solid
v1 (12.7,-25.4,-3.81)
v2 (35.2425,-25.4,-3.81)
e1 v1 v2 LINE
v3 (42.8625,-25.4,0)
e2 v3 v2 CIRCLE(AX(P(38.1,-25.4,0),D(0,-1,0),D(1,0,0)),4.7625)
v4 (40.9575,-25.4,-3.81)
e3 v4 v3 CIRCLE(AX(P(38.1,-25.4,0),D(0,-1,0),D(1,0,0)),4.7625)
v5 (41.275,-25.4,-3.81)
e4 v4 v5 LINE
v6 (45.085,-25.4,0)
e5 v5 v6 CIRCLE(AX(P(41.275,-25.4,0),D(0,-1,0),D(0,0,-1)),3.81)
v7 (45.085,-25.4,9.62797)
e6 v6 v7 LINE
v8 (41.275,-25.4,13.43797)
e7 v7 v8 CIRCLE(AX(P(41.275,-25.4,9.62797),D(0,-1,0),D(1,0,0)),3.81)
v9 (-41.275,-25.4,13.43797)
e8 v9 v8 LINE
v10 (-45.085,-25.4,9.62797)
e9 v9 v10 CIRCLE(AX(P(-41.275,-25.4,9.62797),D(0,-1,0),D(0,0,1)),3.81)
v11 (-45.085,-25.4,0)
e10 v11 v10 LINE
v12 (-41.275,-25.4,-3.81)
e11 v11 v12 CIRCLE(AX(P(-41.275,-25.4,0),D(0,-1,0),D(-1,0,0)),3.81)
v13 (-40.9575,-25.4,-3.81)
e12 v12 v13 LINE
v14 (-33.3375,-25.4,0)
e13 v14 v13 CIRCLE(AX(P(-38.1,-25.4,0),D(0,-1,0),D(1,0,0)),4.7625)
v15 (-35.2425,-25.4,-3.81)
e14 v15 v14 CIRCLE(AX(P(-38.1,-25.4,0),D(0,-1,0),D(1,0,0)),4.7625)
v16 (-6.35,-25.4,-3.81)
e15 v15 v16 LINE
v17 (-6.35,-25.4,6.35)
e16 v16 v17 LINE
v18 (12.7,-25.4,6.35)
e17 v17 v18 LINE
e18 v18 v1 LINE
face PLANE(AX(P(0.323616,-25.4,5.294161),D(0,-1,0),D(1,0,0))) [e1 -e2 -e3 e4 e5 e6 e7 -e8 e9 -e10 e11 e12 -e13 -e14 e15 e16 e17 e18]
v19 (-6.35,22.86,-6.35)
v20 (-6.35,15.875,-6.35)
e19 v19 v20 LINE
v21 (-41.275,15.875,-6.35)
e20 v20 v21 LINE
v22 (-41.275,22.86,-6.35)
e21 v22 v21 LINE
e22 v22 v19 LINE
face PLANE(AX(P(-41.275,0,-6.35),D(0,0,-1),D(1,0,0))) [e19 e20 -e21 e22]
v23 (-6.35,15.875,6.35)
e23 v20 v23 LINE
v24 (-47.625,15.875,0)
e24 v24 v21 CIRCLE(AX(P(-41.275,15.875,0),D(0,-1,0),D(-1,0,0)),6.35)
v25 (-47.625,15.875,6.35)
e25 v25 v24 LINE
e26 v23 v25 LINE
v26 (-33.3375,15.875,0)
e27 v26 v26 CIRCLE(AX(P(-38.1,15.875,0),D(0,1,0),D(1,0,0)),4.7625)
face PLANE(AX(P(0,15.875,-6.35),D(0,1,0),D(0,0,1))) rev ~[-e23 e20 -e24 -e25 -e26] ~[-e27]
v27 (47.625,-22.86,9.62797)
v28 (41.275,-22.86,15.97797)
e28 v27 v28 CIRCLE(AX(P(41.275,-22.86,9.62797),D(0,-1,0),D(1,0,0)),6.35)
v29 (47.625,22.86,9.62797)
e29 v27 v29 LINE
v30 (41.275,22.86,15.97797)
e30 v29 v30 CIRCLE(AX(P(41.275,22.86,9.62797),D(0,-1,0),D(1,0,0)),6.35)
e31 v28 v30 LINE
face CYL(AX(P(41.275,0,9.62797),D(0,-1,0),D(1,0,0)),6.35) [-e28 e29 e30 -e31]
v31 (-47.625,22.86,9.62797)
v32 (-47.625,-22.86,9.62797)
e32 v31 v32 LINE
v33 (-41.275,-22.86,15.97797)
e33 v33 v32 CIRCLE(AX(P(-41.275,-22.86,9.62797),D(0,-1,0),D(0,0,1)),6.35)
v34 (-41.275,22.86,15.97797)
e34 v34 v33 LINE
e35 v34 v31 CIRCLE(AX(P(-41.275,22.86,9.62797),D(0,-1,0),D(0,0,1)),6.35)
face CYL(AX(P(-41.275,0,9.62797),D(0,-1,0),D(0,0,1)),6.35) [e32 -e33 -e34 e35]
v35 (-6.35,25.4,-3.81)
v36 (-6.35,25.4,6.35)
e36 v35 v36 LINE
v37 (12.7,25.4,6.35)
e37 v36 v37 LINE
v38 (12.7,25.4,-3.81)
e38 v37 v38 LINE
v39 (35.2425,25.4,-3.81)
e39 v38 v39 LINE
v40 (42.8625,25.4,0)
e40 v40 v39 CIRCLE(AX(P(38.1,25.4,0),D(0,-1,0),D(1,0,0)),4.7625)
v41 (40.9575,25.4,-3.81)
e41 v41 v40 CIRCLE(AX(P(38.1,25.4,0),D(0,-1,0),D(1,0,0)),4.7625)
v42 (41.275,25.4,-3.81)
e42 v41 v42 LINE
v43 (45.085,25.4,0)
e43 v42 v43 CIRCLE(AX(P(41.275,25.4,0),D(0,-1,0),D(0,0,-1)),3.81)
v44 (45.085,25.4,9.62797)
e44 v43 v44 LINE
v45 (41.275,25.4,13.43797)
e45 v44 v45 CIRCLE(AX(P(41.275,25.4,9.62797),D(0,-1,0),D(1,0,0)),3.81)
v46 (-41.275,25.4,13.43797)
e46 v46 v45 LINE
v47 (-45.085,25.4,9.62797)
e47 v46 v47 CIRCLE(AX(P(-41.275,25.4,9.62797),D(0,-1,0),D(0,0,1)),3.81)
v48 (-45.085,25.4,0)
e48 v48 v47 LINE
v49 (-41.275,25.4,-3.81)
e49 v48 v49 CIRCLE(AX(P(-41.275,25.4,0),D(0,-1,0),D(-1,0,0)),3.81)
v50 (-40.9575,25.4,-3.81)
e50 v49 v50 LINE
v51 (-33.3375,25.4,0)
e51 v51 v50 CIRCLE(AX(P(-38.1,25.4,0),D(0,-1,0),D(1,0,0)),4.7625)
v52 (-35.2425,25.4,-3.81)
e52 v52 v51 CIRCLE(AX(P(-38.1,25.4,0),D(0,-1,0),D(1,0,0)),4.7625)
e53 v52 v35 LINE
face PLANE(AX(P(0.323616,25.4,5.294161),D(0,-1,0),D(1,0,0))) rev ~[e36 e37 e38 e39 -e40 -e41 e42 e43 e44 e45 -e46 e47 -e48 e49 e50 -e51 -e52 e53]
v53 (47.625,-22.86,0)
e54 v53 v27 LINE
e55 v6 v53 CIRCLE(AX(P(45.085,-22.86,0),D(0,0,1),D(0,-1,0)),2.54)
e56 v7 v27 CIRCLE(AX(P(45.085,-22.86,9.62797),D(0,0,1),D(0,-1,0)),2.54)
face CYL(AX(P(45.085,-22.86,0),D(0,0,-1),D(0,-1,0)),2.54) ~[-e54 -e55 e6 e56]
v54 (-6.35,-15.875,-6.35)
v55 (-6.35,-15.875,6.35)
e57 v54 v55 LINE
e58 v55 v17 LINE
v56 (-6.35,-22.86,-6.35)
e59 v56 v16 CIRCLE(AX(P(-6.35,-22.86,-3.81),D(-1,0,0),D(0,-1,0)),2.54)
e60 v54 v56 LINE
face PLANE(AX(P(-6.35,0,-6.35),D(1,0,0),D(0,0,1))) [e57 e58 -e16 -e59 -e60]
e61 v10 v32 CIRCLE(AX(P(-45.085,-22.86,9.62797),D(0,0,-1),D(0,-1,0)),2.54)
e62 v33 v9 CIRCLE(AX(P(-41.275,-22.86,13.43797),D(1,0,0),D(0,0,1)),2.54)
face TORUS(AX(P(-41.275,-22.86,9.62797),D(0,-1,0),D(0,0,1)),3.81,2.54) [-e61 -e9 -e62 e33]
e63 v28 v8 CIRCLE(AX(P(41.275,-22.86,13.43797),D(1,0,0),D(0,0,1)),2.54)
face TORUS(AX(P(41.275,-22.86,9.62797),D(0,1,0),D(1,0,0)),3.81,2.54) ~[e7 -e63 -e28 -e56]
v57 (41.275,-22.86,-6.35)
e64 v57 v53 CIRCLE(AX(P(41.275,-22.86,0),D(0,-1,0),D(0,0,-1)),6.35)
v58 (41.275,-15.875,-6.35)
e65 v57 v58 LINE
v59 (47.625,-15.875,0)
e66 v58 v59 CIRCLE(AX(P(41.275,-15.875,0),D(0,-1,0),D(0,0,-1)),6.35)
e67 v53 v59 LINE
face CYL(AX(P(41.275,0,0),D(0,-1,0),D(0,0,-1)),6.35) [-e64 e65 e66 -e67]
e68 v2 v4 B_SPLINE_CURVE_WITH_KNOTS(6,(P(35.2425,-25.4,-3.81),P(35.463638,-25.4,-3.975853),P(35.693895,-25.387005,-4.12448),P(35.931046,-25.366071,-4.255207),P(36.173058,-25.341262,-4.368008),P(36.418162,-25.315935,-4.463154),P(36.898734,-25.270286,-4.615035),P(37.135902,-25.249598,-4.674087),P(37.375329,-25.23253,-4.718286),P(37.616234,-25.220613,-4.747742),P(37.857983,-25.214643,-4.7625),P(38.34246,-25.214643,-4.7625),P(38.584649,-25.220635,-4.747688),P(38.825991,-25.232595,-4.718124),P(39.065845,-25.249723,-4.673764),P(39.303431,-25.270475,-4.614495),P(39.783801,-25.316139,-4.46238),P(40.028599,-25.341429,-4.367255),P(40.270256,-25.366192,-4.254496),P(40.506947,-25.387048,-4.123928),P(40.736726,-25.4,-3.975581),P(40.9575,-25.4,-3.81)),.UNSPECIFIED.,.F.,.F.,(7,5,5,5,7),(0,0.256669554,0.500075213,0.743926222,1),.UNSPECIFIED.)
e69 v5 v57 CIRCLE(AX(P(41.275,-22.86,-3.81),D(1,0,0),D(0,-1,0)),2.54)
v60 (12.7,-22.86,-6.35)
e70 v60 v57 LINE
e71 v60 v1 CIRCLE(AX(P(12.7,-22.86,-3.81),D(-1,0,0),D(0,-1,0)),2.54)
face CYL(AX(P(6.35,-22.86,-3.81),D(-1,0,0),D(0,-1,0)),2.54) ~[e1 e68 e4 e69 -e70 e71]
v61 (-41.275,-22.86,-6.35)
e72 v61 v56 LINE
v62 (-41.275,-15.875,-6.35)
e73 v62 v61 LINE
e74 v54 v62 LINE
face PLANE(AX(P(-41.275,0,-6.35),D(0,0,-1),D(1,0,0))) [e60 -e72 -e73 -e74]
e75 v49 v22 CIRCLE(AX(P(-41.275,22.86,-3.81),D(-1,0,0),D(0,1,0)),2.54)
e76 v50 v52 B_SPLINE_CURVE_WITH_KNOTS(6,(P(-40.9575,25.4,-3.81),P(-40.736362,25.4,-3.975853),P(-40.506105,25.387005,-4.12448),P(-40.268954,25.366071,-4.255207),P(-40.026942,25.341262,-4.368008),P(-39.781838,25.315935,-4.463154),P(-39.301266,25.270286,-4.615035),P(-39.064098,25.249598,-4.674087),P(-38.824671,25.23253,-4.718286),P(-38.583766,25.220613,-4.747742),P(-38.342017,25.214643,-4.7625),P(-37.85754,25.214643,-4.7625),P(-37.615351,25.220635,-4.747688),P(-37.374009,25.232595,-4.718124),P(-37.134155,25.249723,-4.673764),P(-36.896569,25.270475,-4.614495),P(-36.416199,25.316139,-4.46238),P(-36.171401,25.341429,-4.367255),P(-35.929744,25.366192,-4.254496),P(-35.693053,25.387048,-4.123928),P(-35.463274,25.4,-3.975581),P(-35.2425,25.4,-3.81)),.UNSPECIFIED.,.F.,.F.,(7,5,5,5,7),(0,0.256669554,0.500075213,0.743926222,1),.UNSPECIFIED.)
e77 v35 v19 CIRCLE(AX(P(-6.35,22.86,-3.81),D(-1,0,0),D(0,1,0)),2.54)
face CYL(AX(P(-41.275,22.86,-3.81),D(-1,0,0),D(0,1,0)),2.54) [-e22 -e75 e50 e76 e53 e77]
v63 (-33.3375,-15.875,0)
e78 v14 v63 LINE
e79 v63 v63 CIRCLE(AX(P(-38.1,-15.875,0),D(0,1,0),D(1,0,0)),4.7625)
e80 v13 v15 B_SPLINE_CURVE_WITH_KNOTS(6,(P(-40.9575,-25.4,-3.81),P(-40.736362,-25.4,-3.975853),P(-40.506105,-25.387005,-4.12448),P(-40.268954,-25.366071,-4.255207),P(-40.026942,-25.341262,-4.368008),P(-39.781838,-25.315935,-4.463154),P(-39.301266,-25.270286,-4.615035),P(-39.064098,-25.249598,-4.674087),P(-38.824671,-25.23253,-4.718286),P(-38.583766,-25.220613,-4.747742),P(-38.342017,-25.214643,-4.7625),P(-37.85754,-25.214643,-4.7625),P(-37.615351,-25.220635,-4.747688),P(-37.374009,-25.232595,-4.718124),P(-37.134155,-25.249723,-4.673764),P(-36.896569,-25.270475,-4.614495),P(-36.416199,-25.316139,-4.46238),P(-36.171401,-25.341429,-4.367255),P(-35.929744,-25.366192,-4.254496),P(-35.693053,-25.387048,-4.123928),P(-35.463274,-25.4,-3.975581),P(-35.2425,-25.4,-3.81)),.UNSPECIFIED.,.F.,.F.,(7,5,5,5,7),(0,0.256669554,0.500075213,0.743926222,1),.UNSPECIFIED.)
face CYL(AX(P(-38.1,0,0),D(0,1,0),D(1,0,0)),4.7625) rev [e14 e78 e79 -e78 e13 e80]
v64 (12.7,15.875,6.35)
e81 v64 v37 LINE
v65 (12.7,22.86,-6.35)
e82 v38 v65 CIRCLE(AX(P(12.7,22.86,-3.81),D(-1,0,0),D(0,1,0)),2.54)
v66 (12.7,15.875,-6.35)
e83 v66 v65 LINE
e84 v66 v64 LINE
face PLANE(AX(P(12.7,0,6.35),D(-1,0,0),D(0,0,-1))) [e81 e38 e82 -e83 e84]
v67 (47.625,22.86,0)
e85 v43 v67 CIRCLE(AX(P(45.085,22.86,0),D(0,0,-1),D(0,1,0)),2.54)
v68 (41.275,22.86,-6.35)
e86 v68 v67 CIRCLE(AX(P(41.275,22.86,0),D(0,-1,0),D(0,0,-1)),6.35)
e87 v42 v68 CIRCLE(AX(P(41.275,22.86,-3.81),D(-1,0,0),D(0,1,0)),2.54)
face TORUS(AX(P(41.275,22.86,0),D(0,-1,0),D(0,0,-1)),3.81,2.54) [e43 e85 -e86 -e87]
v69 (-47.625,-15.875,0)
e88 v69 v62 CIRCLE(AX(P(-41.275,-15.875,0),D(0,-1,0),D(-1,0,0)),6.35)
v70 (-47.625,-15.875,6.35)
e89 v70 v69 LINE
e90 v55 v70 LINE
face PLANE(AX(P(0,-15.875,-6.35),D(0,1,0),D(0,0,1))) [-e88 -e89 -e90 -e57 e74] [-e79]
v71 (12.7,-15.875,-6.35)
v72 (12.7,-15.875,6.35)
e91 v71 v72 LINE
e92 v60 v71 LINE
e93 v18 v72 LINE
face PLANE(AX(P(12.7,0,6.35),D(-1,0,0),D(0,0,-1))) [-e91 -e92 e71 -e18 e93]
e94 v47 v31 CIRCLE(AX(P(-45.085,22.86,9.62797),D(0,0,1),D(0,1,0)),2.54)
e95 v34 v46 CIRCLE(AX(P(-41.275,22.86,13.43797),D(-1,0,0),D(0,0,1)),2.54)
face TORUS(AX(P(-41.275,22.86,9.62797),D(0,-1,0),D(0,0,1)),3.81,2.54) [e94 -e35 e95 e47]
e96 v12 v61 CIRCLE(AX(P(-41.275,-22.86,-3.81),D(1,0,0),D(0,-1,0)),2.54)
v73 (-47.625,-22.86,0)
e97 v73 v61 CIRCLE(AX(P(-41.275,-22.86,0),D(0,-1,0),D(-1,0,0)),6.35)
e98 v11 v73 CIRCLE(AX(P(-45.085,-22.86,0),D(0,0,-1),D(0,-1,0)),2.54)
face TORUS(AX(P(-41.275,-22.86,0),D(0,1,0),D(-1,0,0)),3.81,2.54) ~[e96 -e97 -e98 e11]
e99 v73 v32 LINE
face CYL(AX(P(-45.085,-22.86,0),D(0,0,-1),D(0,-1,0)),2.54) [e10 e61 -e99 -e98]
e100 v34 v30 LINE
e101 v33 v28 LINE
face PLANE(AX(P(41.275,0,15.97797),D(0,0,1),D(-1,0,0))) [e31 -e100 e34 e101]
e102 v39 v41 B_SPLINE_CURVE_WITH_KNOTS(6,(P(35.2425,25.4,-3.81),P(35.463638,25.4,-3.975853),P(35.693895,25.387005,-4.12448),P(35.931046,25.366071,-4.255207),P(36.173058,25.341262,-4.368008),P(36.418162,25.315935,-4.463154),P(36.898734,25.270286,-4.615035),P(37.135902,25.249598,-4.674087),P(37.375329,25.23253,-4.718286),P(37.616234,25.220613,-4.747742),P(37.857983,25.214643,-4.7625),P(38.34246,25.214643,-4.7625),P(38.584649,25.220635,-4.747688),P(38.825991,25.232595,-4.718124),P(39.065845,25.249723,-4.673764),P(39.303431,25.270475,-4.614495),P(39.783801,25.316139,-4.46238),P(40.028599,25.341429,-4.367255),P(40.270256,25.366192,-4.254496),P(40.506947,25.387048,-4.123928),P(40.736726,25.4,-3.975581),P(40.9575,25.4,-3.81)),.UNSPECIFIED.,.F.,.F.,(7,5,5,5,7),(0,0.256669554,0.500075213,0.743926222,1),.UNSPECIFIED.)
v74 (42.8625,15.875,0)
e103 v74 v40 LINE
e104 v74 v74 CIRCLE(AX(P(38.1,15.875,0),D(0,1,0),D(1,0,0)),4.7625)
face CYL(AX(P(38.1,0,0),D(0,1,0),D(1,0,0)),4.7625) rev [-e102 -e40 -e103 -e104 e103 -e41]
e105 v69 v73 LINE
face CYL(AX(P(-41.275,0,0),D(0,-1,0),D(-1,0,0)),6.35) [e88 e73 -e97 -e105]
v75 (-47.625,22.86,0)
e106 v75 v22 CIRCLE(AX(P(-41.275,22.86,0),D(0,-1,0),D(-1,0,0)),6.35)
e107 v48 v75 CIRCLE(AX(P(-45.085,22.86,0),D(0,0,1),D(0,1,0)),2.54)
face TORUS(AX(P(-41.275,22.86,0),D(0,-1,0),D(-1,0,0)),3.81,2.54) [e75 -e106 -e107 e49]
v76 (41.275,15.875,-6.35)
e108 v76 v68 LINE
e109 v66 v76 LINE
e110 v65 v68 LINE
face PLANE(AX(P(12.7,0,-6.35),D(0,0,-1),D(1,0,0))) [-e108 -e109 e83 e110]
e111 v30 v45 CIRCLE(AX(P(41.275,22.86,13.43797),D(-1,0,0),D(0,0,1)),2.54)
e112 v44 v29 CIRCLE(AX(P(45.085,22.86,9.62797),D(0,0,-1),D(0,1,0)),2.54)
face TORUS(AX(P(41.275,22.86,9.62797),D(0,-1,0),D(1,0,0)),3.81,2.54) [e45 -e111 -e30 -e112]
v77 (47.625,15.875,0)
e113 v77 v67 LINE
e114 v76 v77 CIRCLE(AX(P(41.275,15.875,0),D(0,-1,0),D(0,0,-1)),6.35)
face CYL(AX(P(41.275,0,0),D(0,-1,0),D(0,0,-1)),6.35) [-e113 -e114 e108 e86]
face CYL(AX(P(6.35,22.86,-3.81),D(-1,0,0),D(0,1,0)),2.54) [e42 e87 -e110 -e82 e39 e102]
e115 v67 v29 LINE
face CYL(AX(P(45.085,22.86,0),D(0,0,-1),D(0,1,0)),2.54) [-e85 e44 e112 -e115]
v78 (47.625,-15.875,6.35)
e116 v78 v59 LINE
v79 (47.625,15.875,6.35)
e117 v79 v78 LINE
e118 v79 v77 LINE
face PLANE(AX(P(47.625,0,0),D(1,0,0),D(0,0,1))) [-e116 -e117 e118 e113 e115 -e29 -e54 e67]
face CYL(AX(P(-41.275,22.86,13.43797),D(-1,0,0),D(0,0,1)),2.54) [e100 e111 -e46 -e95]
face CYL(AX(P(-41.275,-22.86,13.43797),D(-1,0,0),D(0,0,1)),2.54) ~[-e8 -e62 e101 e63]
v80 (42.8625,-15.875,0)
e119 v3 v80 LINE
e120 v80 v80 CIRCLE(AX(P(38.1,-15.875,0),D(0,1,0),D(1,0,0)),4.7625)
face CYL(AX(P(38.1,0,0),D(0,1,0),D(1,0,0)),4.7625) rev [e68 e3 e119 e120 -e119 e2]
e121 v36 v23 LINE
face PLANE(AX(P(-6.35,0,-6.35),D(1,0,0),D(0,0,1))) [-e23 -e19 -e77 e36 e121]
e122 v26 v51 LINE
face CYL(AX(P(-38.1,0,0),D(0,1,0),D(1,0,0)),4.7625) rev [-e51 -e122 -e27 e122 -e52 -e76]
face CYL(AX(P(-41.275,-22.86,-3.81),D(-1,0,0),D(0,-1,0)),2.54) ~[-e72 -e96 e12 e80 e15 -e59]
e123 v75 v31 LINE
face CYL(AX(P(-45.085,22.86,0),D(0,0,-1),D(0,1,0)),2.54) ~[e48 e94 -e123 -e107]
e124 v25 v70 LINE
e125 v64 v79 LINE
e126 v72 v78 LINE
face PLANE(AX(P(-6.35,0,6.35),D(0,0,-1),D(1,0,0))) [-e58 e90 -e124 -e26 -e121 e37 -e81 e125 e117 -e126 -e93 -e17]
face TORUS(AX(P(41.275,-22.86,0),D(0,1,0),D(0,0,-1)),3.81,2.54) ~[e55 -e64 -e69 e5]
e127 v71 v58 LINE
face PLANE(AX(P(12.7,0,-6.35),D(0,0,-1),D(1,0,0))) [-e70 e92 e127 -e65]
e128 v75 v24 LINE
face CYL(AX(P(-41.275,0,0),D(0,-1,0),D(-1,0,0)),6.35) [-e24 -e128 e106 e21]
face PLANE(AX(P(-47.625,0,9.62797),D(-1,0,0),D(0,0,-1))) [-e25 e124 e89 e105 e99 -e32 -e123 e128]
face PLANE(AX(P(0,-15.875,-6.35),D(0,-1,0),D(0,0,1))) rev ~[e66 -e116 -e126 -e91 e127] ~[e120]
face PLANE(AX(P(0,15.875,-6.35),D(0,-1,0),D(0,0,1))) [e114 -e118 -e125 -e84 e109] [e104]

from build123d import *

# Parameters (mm, degrees)
F0_R          = 4.7625
F1_DEPTH      = 25.4
F2_W          = 31.75
F2_H          = 12.7
F3_DEPTH      = 47.626
F3_DEPTH_BACK = 47.626
F4_T1_DEPTH   = 82.55
F4_T3_DEPTH   = 9.6279704779
F4_T5_DEPTH   = 41.275
F4_T7_DEPTH   = 34.925
F4_T10_ANGLE  = 90
F4_T12_ANGLE  = 90
F4_T14_ANGLE  = 90
F4_T16_ANGLE  = 90
F4_T18_ANGLE  = 90
F4_T20_ANGLE  = 90
F4_T22_ANGLE  = 90
F4_T24_ANGLE  = 90


# Not quite as in the source:
# - a fillet or chamfer that OpenCascade refuses, or shapes differently, is made with other operations: its cross-section is extruded or revolved along the edge and cut away or added


with BuildPart() as f1:
    # F0 (on Front) → F1 (new body, symmetric)
    with BuildSketch(Plane.XZ):
        with BuildLine():
            Line((41.275, 15.9779704779), (-41.275, 15.9779704779))
            ThreePointArc((-41.275, 15.9779704779), (-45.7651280605, 14.1180985385), (-47.625, 9.6279704779))
            Line((-47.625, 9.6279704779), (-47.625, 0))
            ThreePointArc((-47.625, 0), (-45.7651280605, -4.4901280605), (-41.275, -6.35))
            Line((-41.275, -6.35), (-6.35, -6.35))
            Line((-6.35, -6.35), (-6.35, 6.35))
            Line((-6.35, 6.35), (12.7, 6.35))
            Line((12.7, 6.35), (12.7, -6.35))
            Line((12.7, -6.35), (41.275, -6.35))
            ThreePointArc((41.275, -6.35), (45.7651280605, -4.4901280605), (47.625, 0))
            Line((47.625, 0), (47.625, 9.6279704779))
            ThreePointArc((47.625, 9.6279704779), (45.7651280605, 14.1180985385), (41.275, 15.9779704779))
        make_face()
        with Locations((-38.1, 0)):
            Circle(F0_R, mode=Mode.SUBTRACT)
        with Locations((38.1, 0)):
            Circle(F0_R, mode=Mode.SUBTRACT)
    extrude(amount=F1_DEPTH, both=True)

    # F2 (on Right) → F3 (cut, two sides)
    with BuildSketch(Plane.YZ) as f3_sk:
        Rectangle(F2_W, F2_H)
    extrude(amount=F3_DEPTH, mode=Mode.SUBTRACT)
    extrude(f3_sk.sketch, amount=-F3_DEPTH_BACK, mode=Mode.SUBTRACT)

    # F4: fillet of radius 2.54 on 18 edges, made by hand

    # F4_s2 → F4_t1 (cut)
    with BuildSketch(Plane.YZ.offset(-41.275)):
        with BuildLine():
            ThreePointArc((22.86, 15.9779704779), (24.6560512242, 15.2340217022), (25.4, 13.4379704779))
            Line((25.4, 13.4379704779), (25.4, 15.9779704779))
            Line((25.4, 15.9779704779), (22.86, 15.9779704779))
        make_face()
        with BuildLine():
            ThreePointArc((-22.86, 15.9779704779), (-24.6560512242, 15.2340217022), (-25.4, 13.4379704779))
            Line((-25.4, 13.4379704779), (-25.4, 15.9779704779))
            Line((-25.4, 15.9779704779), (-22.86, 15.9779704779))
        make_face()
    extrude(amount=F4_T1_DEPTH, mode=Mode.SUBTRACT)

    # F4_s4 → F4_t3 (cut)
    with BuildSketch(Plane.XY):
        with BuildLine():
            ThreePointArc((-45.085, 25.4), (-46.8810512242, 24.6560512242), (-47.625, 22.86))
            Line((-47.625, 22.86), (-47.625, 25.4))
            Line((-47.625, 25.4), (-45.085, 25.4))
        make_face()
        with BuildLine():
            ThreePointArc((45.085, 25.4), (46.8810512242, 24.6560512242), (47.625, 22.86))
            Line((47.625, 22.86), (47.625, 25.4))
            Line((47.625, 25.4), (45.085, 25.4))
        make_face()
        with BuildLine():
            ThreePointArc((-45.085, -25.4), (-46.8810512242, -24.6560512242), (-47.625, -22.86))
            Line((-47.625, -22.86), (-47.625, -25.4))
            Line((-47.625, -25.4), (-45.085, -25.4))
        make_face()
        with BuildLine():
            ThreePointArc((45.085, -25.4), (46.8810512242, -24.6560512242), (47.625, -22.86))
            Line((47.625, -22.86), (47.625, -25.4))
            Line((47.625, -25.4), (45.085, -25.4))
        make_face()
    extrude(amount=F4_T3_DEPTH, mode=Mode.SUBTRACT)

    # F4_s6 → F4_t5 (cut)
    with BuildSketch(Plane.YZ.offset(-41.275)):
        with BuildLine():
            ThreePointArc((25.4, -3.81), (24.6560512242, -5.6060512242), (22.86, -6.35))
            Line((22.86, -6.35), (25.4, -6.35))
            Line((25.4, -6.35), (25.4, -3.81))
        make_face()
        with BuildLine():
            ThreePointArc((-25.4, -3.81), (-24.6560512242, -5.6060512242), (-22.86, -6.35))
            Line((-22.86, -6.35), (-25.4, -6.35))
            Line((-25.4, -6.35), (-25.4, -3.81))
        make_face()
    extrude(amount=F4_T5_DEPTH, mode=Mode.SUBTRACT)

    # F4_s8 → F4_t7 (cut)
    with BuildSketch(Plane.YZ.offset(6.35)):
        with BuildLine():
            ThreePointArc((25.4, -3.81), (24.6560512242, -5.6060512242), (22.86, -6.35))
            Line((22.86, -6.35), (25.4, -6.35))
            Line((25.4, -6.35), (25.4, -3.81))
        make_face()
        with BuildLine():
            ThreePointArc((-25.4, -3.81), (-24.6560512242, -5.6060512242), (-22.86, -6.35))
            Line((-22.86, -6.35), (-25.4, -6.35))
            Line((-25.4, -6.35), (-25.4, -3.81))
        make_face()
    extrude(amount=F4_T7_DEPTH, mode=Mode.SUBTRACT)

    # F4_s9 → F4_t10 (revolve, cut)
    with BuildSketch(Plane.YZ.offset(-41.275)):
        with BuildLine():
            ThreePointArc((25.4, 13.4379704779), (24.6560512242, 15.2340217022), (22.86, 15.9779704779))
            Line((22.86, 15.9779704779), (25.4, 15.9779704779))
            Line((25.4, 15.9779704779), (25.4, 13.4379704779))
        make_face()
    revolve(axis=Axis((-41.275, 25.4, 9.6279704779), (0, -1, 0)), revolution_arc=F4_T10_ANGLE, mode=Mode.SUBTRACT)

    # F4_s11 → F4_t12 (revolve, cut)
    with BuildSketch(Plane.XY):
        with BuildLine():
            ThreePointArc((-45.085, 25.4), (-46.8810512242, 24.6560512242), (-47.625, 22.86))
            Line((-47.625, 22.86), (-47.625, 25.4))
            Line((-47.625, 25.4), (-45.085, 25.4))
        make_face()
    revolve(axis=Axis((-41.275, 25.4, 0), (0, -1, 0)), revolution_arc=F4_T12_ANGLE, mode=Mode.SUBTRACT)

    # F4_s13 → F4_t14 (revolve, cut)
    with BuildSketch(Plane.YZ.offset(41.275)):
        with BuildLine():
            ThreePointArc((25.4, -3.81), (24.6560512242, -5.6060512242), (22.86, -6.35))
            Line((22.86, -6.35), (25.4, -6.35))
            Line((25.4, -6.35), (25.4, -3.81))
        make_face()
    revolve(axis=Axis((41.275, 25.4, 0), (0, -1, 0)), revolution_arc=F4_T14_ANGLE, mode=Mode.SUBTRACT)

    # F4_s15 → F4_t16 (revolve, cut)
    with BuildSketch(Plane.XY.offset(9.6279704779)):
        with BuildLine():
            ThreePointArc((45.085, 25.4), (46.8810512242, 24.6560512242), (47.625, 22.86))
            Line((47.625, 22.86), (47.625, 25.4))
            Line((47.625, 25.4), (45.085, 25.4))
        make_face()
    revolve(axis=Axis((41.275, 25.4, 9.6279704779), (0, -1, 0)), revolution_arc=F4_T16_ANGLE, mode=Mode.SUBTRACT)

    # F4_s17 → F4_t18 (revolve, cut)
    with BuildSketch(Plane.YZ.offset(-41.275)):
        with BuildLine():
            ThreePointArc((-22.86, 15.9779704779), (-24.6560512242, 15.2340217022), (-25.4, 13.4379704779))
            Line((-25.4, 13.4379704779), (-25.4, 15.9779704779))
            Line((-25.4, 15.9779704779), (-22.86, 15.9779704779))
        make_face()
    revolve(axis=Axis((-41.275, -25.4, 9.6279704779), (0, -1, 0)), revolution_arc=F4_T18_ANGLE, mode=Mode.SUBTRACT)

    # F4_s19 → F4_t20 (revolve, cut)
    with BuildSketch(Plane.XY):
        with BuildLine():
            ThreePointArc((-45.085, -25.4), (-46.8810512242, -24.6560512242), (-47.625, -22.86))
            Line((-47.625, -22.86), (-47.625, -25.4))
            Line((-47.625, -25.4), (-45.085, -25.4))
        make_face()
    revolve(axis=Axis((-41.275, -25.4, 0), (0, -1, 0)), revolution_arc=F4_T20_ANGLE, mode=Mode.SUBTRACT)

    # F4_s21 → F4_t22 (revolve, cut)
    with BuildSketch(Plane.YZ.offset(41.275)):
        with BuildLine():
            ThreePointArc((-25.4, -3.81), (-24.6560512242, -5.6060512242), (-22.86, -6.35))
            Line((-22.86, -6.35), (-25.4, -6.35))
            Line((-25.4, -6.35), (-25.4, -3.81))
        make_face()
    revolve(axis=Axis((41.275, -25.4, 0), (0, -1, 0)), revolution_arc=F4_T22_ANGLE, mode=Mode.SUBTRACT)

    # F4_s23 → F4_t24 (revolve, cut)
    with BuildSketch(Plane.XY.offset(9.6279704779)):
        with BuildLine():
            ThreePointArc((45.085, -25.4), (46.8810512242, -24.6560512242), (47.625, -22.86))
            Line((47.625, -22.86), (47.625, -25.4))
            Line((47.625, -25.4), (45.085, -25.4))
        make_face()
    revolve(axis=Axis((41.275, -25.4, 9.6279704779), (0, -1, 0)), revolution_arc=F4_T24_ANGLE, mode=Mode.SUBTRACT)


solid = f1.part
